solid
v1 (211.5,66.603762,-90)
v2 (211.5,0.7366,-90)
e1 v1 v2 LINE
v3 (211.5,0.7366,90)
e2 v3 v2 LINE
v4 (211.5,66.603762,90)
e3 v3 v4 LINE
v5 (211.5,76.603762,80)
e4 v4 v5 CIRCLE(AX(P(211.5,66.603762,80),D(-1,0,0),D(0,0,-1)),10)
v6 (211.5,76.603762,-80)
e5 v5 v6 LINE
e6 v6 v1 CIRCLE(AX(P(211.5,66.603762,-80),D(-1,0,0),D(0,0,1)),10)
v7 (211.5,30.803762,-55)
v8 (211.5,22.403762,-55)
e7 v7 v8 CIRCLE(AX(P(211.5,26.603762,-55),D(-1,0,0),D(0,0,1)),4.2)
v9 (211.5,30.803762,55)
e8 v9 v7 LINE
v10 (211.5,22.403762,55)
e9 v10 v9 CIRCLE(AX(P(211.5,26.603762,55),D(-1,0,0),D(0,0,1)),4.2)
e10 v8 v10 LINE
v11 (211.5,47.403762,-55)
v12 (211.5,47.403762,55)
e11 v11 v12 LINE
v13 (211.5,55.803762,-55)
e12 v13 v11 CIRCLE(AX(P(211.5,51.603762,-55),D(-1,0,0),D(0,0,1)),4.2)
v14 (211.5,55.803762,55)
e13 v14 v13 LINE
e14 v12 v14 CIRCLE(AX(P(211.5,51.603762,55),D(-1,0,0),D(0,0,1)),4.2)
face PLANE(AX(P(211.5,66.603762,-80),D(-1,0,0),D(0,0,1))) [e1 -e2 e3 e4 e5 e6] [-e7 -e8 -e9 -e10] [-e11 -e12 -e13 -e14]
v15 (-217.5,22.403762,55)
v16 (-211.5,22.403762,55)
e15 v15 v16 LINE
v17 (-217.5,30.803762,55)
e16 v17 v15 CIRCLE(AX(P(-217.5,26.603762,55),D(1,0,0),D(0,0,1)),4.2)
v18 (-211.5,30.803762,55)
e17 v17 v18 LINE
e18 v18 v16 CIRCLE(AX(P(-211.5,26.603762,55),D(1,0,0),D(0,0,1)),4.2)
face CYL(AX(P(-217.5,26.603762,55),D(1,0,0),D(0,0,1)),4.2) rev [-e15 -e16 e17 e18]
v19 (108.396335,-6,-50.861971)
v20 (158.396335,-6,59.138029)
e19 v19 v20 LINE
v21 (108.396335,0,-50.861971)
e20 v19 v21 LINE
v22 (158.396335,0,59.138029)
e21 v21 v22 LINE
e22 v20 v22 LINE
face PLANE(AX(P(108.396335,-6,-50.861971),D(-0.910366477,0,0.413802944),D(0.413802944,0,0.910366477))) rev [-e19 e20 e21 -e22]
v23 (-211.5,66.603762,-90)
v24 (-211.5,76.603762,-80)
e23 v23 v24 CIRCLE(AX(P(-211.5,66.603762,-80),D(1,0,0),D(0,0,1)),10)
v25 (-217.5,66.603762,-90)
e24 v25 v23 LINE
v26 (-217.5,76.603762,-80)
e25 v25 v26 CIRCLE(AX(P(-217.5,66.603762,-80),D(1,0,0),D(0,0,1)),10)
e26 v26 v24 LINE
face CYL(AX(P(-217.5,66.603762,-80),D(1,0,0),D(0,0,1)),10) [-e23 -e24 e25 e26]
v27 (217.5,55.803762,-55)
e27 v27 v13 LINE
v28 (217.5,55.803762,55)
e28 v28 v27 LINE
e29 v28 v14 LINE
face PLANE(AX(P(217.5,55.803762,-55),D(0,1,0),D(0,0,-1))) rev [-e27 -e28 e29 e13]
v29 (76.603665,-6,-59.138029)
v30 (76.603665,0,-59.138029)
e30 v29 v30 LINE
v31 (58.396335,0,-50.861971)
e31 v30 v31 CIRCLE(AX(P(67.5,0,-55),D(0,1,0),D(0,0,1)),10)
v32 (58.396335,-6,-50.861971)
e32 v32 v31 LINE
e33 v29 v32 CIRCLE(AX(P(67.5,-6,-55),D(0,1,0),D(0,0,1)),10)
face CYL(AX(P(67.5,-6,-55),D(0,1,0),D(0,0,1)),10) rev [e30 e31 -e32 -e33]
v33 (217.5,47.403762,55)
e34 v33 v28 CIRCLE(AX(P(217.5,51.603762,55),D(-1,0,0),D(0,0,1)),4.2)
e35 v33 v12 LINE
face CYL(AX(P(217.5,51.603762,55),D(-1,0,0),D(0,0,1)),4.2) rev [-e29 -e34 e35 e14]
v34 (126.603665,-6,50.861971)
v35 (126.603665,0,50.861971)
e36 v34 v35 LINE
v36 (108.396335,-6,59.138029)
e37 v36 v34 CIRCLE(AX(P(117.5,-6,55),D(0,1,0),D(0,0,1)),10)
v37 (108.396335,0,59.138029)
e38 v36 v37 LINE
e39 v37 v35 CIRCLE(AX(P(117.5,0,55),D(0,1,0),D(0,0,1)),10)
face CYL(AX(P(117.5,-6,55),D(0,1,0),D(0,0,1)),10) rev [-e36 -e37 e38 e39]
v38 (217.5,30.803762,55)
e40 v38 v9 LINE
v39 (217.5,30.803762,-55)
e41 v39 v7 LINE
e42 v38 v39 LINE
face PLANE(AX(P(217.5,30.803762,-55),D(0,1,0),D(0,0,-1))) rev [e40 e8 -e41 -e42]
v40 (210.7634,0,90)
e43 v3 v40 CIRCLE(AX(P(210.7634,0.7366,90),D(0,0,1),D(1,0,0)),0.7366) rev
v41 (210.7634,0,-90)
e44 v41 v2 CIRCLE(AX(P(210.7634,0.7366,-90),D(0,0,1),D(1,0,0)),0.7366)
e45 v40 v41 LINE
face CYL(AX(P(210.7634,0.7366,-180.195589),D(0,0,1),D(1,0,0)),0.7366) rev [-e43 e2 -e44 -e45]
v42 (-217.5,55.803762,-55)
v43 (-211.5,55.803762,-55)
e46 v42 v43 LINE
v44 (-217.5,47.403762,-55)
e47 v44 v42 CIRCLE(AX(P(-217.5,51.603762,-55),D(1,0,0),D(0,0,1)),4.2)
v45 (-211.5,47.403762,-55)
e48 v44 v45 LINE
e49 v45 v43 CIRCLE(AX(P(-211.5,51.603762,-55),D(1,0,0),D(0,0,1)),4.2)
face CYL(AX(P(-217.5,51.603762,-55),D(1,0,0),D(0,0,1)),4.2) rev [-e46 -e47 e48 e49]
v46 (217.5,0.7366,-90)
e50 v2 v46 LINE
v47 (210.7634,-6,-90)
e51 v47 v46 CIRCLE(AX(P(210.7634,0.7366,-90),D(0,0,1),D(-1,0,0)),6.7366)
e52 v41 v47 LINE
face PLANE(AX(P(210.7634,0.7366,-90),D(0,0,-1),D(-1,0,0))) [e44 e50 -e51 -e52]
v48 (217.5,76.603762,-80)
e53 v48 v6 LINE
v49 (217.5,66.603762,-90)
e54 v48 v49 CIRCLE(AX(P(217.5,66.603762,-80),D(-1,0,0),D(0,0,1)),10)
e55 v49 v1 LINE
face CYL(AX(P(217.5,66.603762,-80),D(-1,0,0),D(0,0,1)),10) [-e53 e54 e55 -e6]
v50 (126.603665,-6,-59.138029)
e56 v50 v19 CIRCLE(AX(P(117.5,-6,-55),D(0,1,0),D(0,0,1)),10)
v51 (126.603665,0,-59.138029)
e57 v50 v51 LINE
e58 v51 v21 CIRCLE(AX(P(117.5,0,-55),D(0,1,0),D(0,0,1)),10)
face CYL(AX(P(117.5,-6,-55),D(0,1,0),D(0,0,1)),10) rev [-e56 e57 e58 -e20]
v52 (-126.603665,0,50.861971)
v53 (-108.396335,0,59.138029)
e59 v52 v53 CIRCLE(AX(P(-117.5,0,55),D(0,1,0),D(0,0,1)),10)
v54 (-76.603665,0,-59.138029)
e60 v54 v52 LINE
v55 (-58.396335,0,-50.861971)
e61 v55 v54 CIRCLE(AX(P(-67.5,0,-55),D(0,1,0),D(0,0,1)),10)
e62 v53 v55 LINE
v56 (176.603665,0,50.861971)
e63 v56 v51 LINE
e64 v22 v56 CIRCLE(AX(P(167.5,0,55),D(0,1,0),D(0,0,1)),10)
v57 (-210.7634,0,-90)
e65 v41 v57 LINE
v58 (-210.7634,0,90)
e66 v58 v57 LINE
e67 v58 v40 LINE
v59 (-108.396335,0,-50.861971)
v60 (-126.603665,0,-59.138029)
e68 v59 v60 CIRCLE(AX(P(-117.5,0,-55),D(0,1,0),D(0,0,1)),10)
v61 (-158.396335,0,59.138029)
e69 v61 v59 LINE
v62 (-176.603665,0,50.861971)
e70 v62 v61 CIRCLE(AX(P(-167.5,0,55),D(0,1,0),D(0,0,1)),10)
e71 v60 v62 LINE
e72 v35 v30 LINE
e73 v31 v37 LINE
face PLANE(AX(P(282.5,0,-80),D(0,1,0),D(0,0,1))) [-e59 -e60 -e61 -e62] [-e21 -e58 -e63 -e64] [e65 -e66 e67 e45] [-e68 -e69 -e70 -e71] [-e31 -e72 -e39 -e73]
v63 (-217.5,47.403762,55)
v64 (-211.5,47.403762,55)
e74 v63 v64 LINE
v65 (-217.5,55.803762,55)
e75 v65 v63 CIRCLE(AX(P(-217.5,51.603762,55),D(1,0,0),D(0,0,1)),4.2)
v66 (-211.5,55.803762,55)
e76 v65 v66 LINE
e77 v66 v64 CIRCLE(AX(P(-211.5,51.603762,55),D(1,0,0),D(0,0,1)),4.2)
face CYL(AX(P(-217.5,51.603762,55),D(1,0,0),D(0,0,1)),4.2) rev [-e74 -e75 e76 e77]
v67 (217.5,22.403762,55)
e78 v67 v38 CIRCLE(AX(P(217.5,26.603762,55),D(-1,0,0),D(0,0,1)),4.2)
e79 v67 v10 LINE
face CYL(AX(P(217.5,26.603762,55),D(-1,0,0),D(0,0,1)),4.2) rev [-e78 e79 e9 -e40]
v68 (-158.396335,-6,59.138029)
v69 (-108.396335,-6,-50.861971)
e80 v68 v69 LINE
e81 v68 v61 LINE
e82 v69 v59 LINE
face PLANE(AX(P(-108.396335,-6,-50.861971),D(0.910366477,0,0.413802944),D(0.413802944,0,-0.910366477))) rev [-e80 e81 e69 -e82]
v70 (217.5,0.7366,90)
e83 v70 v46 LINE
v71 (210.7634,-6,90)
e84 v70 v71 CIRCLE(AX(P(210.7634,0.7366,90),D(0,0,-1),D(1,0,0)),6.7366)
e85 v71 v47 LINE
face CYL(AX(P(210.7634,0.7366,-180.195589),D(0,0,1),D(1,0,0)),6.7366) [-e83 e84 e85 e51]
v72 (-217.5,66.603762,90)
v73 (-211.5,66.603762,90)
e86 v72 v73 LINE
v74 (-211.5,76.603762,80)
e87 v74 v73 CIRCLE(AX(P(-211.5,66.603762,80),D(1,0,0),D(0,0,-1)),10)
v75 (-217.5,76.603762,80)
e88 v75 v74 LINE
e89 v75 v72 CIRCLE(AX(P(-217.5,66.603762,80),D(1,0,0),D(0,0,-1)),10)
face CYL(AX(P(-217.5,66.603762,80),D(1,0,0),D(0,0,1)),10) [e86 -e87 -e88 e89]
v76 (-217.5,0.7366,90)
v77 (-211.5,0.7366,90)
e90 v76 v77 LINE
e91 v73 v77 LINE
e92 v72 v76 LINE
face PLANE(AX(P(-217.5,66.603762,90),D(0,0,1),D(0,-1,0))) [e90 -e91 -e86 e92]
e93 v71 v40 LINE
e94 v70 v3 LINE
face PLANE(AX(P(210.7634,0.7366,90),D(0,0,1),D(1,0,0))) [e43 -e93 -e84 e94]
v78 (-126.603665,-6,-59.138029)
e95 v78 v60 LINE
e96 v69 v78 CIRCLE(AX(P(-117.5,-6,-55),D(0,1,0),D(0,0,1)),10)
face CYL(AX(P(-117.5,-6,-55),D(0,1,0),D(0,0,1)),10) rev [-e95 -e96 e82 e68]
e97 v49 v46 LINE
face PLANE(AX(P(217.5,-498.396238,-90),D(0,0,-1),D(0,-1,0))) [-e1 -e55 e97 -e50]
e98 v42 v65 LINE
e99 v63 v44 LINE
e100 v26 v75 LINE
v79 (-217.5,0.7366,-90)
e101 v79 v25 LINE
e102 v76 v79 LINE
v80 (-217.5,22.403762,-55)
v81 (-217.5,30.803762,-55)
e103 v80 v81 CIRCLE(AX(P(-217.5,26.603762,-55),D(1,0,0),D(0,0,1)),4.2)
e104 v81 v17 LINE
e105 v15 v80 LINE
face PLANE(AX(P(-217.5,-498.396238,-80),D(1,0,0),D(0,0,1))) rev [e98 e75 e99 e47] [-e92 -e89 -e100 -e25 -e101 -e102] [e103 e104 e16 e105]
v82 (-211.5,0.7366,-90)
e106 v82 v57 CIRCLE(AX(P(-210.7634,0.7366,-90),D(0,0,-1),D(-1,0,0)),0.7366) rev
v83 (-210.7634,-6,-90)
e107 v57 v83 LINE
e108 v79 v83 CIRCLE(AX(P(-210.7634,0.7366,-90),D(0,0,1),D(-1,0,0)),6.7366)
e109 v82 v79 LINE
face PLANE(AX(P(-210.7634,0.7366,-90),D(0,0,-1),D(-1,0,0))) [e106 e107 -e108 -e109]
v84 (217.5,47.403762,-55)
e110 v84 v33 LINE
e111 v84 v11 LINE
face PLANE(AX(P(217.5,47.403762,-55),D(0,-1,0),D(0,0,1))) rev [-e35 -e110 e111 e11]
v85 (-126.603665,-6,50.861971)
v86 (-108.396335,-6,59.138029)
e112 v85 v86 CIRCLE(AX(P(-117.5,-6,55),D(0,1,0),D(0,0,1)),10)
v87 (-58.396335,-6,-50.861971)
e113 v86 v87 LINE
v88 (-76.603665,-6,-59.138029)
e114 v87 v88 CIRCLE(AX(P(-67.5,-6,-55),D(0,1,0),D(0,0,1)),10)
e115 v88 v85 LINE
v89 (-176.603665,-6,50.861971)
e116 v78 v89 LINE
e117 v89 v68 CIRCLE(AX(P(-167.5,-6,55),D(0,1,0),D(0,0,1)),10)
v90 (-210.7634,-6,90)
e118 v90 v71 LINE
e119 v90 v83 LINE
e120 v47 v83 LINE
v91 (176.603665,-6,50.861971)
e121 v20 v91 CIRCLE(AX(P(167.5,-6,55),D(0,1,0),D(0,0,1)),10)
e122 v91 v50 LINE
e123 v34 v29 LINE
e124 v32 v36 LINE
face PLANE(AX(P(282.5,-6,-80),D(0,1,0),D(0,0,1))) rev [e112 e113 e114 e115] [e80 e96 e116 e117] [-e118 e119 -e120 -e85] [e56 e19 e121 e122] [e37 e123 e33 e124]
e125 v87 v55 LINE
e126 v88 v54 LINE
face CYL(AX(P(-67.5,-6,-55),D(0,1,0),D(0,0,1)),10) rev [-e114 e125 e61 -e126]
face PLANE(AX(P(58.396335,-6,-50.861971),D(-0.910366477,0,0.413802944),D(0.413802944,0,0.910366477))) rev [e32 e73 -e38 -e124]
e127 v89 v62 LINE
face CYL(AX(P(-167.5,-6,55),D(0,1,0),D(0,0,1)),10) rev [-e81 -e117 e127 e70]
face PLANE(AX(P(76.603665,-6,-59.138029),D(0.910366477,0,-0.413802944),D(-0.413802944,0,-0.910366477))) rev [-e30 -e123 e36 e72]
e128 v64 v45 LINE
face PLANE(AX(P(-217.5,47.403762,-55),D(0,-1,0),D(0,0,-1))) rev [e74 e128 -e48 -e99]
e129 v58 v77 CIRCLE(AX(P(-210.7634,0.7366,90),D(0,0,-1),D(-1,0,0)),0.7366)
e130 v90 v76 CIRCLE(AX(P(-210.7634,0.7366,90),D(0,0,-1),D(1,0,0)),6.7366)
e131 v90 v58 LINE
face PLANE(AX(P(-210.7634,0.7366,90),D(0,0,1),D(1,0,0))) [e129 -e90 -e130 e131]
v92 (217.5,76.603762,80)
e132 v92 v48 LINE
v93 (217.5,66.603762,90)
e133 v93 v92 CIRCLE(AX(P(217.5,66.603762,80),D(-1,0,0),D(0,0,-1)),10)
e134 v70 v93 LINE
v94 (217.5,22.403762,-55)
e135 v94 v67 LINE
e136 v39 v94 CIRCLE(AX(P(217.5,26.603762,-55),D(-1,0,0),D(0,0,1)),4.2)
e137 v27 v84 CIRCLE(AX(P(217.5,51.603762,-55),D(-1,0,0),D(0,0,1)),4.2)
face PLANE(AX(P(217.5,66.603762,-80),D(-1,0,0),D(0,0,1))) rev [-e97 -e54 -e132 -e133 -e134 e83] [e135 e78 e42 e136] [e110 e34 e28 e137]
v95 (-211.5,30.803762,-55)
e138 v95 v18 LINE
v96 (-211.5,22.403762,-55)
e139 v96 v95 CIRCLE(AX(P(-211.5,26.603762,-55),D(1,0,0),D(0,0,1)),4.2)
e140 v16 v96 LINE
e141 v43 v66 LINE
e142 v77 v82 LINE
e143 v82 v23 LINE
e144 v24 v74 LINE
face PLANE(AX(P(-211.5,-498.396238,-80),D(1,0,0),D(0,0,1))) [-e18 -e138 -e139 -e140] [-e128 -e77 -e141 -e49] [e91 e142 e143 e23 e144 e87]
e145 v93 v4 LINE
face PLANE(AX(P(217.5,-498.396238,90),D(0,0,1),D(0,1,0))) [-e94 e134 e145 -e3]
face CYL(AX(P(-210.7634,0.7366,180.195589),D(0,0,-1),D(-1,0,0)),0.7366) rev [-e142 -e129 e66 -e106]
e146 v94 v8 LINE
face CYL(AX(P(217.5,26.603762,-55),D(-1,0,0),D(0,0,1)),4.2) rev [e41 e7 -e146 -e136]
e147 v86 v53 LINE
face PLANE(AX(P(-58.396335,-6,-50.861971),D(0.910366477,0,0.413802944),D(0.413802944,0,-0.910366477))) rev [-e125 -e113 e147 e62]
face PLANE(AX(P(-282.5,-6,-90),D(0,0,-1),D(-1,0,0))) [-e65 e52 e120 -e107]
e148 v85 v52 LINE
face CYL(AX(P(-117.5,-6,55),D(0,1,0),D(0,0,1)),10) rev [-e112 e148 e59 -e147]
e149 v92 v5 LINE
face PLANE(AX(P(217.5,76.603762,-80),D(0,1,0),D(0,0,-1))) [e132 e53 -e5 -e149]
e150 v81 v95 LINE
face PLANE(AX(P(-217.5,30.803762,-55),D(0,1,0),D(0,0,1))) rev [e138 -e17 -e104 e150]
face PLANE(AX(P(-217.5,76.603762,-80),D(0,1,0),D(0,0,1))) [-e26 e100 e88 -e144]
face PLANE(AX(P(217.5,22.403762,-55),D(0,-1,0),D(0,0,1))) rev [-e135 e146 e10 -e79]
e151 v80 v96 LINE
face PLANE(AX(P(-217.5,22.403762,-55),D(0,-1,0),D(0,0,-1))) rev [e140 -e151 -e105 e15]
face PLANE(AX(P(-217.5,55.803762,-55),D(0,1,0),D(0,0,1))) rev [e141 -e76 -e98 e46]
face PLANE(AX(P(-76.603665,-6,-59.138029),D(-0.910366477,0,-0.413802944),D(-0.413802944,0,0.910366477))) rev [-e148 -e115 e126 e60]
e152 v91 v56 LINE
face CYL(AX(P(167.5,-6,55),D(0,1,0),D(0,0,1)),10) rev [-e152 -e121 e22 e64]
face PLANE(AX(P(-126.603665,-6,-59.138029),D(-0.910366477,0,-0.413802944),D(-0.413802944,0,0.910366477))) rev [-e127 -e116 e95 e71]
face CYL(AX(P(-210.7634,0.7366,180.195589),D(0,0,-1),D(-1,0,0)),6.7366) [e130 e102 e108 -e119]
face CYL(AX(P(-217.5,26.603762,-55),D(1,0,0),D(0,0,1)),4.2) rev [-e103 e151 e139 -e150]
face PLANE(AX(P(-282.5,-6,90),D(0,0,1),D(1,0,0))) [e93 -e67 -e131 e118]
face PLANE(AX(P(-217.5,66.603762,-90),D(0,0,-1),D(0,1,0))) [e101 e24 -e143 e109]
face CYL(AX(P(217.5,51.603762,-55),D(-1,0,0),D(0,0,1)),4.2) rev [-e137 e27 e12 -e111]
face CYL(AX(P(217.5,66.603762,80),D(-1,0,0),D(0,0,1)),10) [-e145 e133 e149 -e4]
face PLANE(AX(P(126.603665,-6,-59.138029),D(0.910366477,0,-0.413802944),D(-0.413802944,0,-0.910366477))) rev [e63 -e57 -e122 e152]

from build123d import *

# Parameters (mm, degrees)
BASE_FLANGE1_DEPTH         = 6
SKETCHED_START             = -292.5
SKETCHED_BEND1_OUTLINE_W   = 6
SKETCHED_BEND1_OUTLINE_H   = 180
SKETCHED_BEND1_DEPTH       = 75
SKETCHED_START_2           = 217.5
SKETCHED_BEND1_2_OUTLINE_W = 6
SKETCHED_BEND1_2_OUTLINE_H = 180
SKETCHED_BEND1_2_DEPTH     = 75
SKETCHED_START_3           = -217.5
SKETCHED_BEND1_3_DEPTH     = 6.7366
SKETCHED_START_4           = 210.7634
SKETCHED_BEND1_4_DEPTH     = 6.7366
SKETCHED_START_5           = -91
SKETCHED_BEND1_5_DEPTH     = 182


with BuildPart() as part:
    # Base-Flange1: sheet metal written as solids
    # Sketch1 → Base-Flange1 (new body)
    with BuildSketch(Plane(origin=(0, 0, 0), x_dir=(1, 0, 0), z_dir=(0, 1, 0))):
        with BuildLine():
            Line((-282.5, 90), (282.5, 90))
            ThreePointArc((282.5, 90), (289.571067812, 87.071067812), (292.5, 80))
            Line((292.5, 80), (292.5, -80))
            ThreePointArc((292.5, -80), (289.571067812, -87.071067812), (282.5, -90))
            Line((282.5, -90), (-282.5, -90))
            ThreePointArc((-282.5, -90), (-289.571067812, -87.071067812), (-292.5, -80))
            Line((-292.5, -80), (-292.5, 80))
            ThreePointArc((-292.5, 80), (-289.571067812, 87.071067812), (-282.5, 90))
        make_face()
        with BuildLine():
            Line((-263.3, 55), (-263.3, -55))
            ThreePointArc((-263.3, -55), (-267.5, -59.2), (-271.7, -55))
            Line((-271.7, -55), (-271.7, 55))
            ThreePointArc((-271.7, 55), (-267.5, 59.2), (-263.3, 55))
        make_face(mode=Mode.SUBTRACT)
        with BuildLine():
            Line((-238.3, 55), (-238.3, -55))
            ThreePointArc((-238.3, -55), (-242.5, -59.2), (-246.7, -55))
            Line((-246.7, -55), (-246.7, 55))
            ThreePointArc((-246.7, 55), (-242.5, 59.2), (-238.3, 55))
        make_face(mode=Mode.SUBTRACT)
        with BuildLine():
            Line((246.7, 55), (246.7, -55))
            ThreePointArc((246.7, -55), (242.5, -59.2), (238.3, -55))
            Line((238.3, -55), (238.3, 55))
            ThreePointArc((238.3, 55), (242.5, 59.2), (246.7, 55))
        make_face(mode=Mode.SUBTRACT)
        with BuildLine():
            Line((271.7, 55), (271.7, -55))
            ThreePointArc((271.7, -55), (267.5, -59.2), (263.3, -55))
            Line((263.3, -55), (263.3, 55))
            ThreePointArc((263.3, 55), (267.5, 59.2), (271.7, 55))
        make_face(mode=Mode.SUBTRACT)
        with BuildLine():
            Line((-108.396335225, 50.861970557), (-158.396335225, -59.138029443))
            ThreePointArc((-158.396335225, -59.138029443), (-171.638029443, -64.103664775), (-176.603664775, -50.861970557))
            Line((-176.603664775, -50.861970557), (-126.603664775, 59.138029443))
            ThreePointArc((-126.603664775, 59.138029443), (-113.361970557, 64.103664775), (-108.396335225, 50.861970557))
        make_face(mode=Mode.SUBTRACT)
        with BuildLine():
            Line((-58.396335225, 50.861970557), (-108.396335225, -59.138029443))
            ThreePointArc((-108.396335225, -59.138029443), (-121.638029443, -64.103664775), (-126.603664775, -50.861970557))
            Line((-126.603664775, -50.861970557), (-76.603664775, 59.138029443))
            ThreePointArc((-76.603664775, 59.138029443), (-63.361970557, 64.103664775), (-58.396335225, 50.861970557))
        make_face(mode=Mode.SUBTRACT)
        with BuildLine():
            Line((76.603664775, 59.138029443), (126.603664775, -50.861970557))
            ThreePointArc((126.603664775, -50.861970557), (121.638029443, -64.103664775), (108.396335225, -59.138029443))
            Line((108.396335225, -59.138029443), (58.396335225, 50.861970557))
            ThreePointArc((58.396335225, 50.861970557), (63.361970557, 64.103664775), (76.603664775, 59.138029443))
        make_face(mode=Mode.SUBTRACT)
        with BuildLine():
            Line((126.603664775, 59.138029443), (176.603664775, -50.861970557))
            ThreePointArc((176.603664775, -50.861970557), (171.638029443, -64.103664775), (158.396335225, -59.138029443))
            Line((158.396335225, -59.138029443), (108.396335225, 50.861970557))
            ThreePointArc((108.396335225, 50.861970557), (113.361970557, 64.103664775), (126.603664775, 59.138029443))
        make_face(mode=Mode.SUBTRACT)
    extrude(amount=-BASE_FLANGE1_DEPTH)

    # Sketched Bend1: read off the stored shape, not the designer's step
    # Sketched Bend1 outline → Sketched Bend1 (cut)
    with BuildSketch(Plane.YZ.offset(SKETCHED_START)):
        with Locations((-3, 0)):
            Rectangle(SKETCHED_BEND1_OUTLINE_W, SKETCHED_BEND1_OUTLINE_H)
    extrude(amount=SKETCHED_BEND1_DEPTH, mode=Mode.SUBTRACT)

    # Sketched Bend1 2 outline → Sketched Bend1 2 (cut)
    with BuildSketch(Plane.YZ.offset(SKETCHED_START_2)):
        with Locations((-3, 0)):
            Rectangle(SKETCHED_BEND1_2_OUTLINE_W, SKETCHED_BEND1_2_OUTLINE_H)
    extrude(amount=SKETCHED_BEND1_2_DEPTH, mode=Mode.SUBTRACT)

    # Sketched Bend1 3 outline → Sketched Bend1 3 (add)
    with BuildSketch(Plane.YZ.offset(SKETCHED_START_3)):
        with BuildLine():
            Line((0, 90), (0, -90))
            Line((0, -90), (66.603762445, -90))
            ThreePointArc((66.603762445, -90), (73.674830257, -87.071067812), (76.603762445, -80))
            Line((76.603762445, -80), (76.603762445, 80))
            ThreePointArc((76.603762445, 80), (73.674830257, 87.071067812), (66.603762445, 90))
            Line((66.603762445, 90), (0, 90))
        make_face()
        with BuildLine():
            ThreePointArc((22.403762445, 55), (26.603762445, 59.2), (30.803762445, 55))
            Line((30.803762445, 55), (30.803762445, -55))
            ThreePointArc((30.803762445, -55), (26.603762445, -59.2), (22.403762445, -55))
            Line((22.403762445, -55), (22.403762445, 55))
        make_face(mode=Mode.SUBTRACT)
        with BuildLine():
            ThreePointArc((47.403762445, 55), (51.603762445, 59.2), (55.803762445, 55))
            Line((55.803762445, 55), (55.803762445, -55))
            ThreePointArc((55.803762445, -55), (51.603762445, -59.2), (47.403762445, -55))
            Line((47.403762445, -55), (47.403762445, 55))
        make_face(mode=Mode.SUBTRACT)
    extrude(amount=SKETCHED_BEND1_3_DEPTH)

    # Sketched Bend1 4 outline → Sketched Bend1 4 (add)
    with BuildSketch(Plane.YZ.offset(SKETCHED_START_4)):
        with BuildLine():
            Line((0, 90), (0, -90))
            Line((0, -90), (66.603762445, -90))
            ThreePointArc((66.603762445, -90), (73.674830257, -87.071067812), (76.603762445, -80))
            Line((76.603762445, -80), (76.603762445, 80))
            ThreePointArc((76.603762445, 80), (73.674830257, 87.071067812), (66.603762445, 90))
            Line((66.603762445, 90), (0, 90))
        make_face()
        with BuildLine():
            ThreePointArc((22.403762445, 55), (26.603762445, 59.2), (30.803762445, 55))
            Line((30.803762445, 55), (30.803762445, -55))
            ThreePointArc((30.803762445, -55), (26.603762445, -59.2), (22.403762445, -55))
            Line((22.403762445, -55), (22.403762445, 55))
        make_face(mode=Mode.SUBTRACT)
        with BuildLine():
            ThreePointArc((47.403762445, 55), (51.603762445, 59.2), (55.803762445, 55))
            Line((55.803762445, 55), (55.803762445, -55))
            ThreePointArc((55.803762445, -55), (51.603762445, -59.2), (47.403762445, -55))
            Line((47.403762445, -55), (47.403762445, 55))
        make_face(mode=Mode.SUBTRACT)
    extrude(amount=SKETCHED_BEND1_4_DEPTH)

    # Sketched Bend1 5 outline → Sketched Bend1 5 (cut)
    with BuildSketch(Plane.XY.offset(SKETCHED_START_5)):
        with BuildLine():
            Line((-217.5, -6), (-210.7634, -6))
            ThreePointArc((-210.7634, -6), (-215.526895542, -4.026895542), (-217.5, 0.7366))
            Line((-217.5, 0.7366), (-217.5, -6))
        make_face()
        with BuildLine():
            ThreePointArc((217.5, 0.7366), (215.526895542, -4.026895542), (210.7634, -6))
            Line((210.7634, -6), (217.5, -6))
            Line((217.5, -6), (217.5, 0.7366))
        make_face()
        with BuildLine():
            Line((-210.7634, 0), (-210.7634, 76.603762445))
            Line((-210.7634, 76.603762445), (-211.5, 76.603762445))
            Line((-211.5, 76.603762445), (-211.5, 0.7366))
            ThreePointArc((-211.5, 0.7366), (-211.284254855, 0.215745145), (-210.7634, 0))
        make_face()
        with BuildLine():
            ThreePointArc((210.7634, 0), (211.284254855, 0.215745145), (211.5, 0.7366))
            Line((211.5, 0.7366), (211.5, 76.603762445))
            Line((211.5, 76.603762445), (210.7634, 76.603762445))
            Line((210.7634, 76.603762445), (210.7634, 0))
        make_face()
    extrude(amount=SKETCHED_BEND1_5_DEPTH, mode=Mode.SUBTRACT)


solid = part.part
